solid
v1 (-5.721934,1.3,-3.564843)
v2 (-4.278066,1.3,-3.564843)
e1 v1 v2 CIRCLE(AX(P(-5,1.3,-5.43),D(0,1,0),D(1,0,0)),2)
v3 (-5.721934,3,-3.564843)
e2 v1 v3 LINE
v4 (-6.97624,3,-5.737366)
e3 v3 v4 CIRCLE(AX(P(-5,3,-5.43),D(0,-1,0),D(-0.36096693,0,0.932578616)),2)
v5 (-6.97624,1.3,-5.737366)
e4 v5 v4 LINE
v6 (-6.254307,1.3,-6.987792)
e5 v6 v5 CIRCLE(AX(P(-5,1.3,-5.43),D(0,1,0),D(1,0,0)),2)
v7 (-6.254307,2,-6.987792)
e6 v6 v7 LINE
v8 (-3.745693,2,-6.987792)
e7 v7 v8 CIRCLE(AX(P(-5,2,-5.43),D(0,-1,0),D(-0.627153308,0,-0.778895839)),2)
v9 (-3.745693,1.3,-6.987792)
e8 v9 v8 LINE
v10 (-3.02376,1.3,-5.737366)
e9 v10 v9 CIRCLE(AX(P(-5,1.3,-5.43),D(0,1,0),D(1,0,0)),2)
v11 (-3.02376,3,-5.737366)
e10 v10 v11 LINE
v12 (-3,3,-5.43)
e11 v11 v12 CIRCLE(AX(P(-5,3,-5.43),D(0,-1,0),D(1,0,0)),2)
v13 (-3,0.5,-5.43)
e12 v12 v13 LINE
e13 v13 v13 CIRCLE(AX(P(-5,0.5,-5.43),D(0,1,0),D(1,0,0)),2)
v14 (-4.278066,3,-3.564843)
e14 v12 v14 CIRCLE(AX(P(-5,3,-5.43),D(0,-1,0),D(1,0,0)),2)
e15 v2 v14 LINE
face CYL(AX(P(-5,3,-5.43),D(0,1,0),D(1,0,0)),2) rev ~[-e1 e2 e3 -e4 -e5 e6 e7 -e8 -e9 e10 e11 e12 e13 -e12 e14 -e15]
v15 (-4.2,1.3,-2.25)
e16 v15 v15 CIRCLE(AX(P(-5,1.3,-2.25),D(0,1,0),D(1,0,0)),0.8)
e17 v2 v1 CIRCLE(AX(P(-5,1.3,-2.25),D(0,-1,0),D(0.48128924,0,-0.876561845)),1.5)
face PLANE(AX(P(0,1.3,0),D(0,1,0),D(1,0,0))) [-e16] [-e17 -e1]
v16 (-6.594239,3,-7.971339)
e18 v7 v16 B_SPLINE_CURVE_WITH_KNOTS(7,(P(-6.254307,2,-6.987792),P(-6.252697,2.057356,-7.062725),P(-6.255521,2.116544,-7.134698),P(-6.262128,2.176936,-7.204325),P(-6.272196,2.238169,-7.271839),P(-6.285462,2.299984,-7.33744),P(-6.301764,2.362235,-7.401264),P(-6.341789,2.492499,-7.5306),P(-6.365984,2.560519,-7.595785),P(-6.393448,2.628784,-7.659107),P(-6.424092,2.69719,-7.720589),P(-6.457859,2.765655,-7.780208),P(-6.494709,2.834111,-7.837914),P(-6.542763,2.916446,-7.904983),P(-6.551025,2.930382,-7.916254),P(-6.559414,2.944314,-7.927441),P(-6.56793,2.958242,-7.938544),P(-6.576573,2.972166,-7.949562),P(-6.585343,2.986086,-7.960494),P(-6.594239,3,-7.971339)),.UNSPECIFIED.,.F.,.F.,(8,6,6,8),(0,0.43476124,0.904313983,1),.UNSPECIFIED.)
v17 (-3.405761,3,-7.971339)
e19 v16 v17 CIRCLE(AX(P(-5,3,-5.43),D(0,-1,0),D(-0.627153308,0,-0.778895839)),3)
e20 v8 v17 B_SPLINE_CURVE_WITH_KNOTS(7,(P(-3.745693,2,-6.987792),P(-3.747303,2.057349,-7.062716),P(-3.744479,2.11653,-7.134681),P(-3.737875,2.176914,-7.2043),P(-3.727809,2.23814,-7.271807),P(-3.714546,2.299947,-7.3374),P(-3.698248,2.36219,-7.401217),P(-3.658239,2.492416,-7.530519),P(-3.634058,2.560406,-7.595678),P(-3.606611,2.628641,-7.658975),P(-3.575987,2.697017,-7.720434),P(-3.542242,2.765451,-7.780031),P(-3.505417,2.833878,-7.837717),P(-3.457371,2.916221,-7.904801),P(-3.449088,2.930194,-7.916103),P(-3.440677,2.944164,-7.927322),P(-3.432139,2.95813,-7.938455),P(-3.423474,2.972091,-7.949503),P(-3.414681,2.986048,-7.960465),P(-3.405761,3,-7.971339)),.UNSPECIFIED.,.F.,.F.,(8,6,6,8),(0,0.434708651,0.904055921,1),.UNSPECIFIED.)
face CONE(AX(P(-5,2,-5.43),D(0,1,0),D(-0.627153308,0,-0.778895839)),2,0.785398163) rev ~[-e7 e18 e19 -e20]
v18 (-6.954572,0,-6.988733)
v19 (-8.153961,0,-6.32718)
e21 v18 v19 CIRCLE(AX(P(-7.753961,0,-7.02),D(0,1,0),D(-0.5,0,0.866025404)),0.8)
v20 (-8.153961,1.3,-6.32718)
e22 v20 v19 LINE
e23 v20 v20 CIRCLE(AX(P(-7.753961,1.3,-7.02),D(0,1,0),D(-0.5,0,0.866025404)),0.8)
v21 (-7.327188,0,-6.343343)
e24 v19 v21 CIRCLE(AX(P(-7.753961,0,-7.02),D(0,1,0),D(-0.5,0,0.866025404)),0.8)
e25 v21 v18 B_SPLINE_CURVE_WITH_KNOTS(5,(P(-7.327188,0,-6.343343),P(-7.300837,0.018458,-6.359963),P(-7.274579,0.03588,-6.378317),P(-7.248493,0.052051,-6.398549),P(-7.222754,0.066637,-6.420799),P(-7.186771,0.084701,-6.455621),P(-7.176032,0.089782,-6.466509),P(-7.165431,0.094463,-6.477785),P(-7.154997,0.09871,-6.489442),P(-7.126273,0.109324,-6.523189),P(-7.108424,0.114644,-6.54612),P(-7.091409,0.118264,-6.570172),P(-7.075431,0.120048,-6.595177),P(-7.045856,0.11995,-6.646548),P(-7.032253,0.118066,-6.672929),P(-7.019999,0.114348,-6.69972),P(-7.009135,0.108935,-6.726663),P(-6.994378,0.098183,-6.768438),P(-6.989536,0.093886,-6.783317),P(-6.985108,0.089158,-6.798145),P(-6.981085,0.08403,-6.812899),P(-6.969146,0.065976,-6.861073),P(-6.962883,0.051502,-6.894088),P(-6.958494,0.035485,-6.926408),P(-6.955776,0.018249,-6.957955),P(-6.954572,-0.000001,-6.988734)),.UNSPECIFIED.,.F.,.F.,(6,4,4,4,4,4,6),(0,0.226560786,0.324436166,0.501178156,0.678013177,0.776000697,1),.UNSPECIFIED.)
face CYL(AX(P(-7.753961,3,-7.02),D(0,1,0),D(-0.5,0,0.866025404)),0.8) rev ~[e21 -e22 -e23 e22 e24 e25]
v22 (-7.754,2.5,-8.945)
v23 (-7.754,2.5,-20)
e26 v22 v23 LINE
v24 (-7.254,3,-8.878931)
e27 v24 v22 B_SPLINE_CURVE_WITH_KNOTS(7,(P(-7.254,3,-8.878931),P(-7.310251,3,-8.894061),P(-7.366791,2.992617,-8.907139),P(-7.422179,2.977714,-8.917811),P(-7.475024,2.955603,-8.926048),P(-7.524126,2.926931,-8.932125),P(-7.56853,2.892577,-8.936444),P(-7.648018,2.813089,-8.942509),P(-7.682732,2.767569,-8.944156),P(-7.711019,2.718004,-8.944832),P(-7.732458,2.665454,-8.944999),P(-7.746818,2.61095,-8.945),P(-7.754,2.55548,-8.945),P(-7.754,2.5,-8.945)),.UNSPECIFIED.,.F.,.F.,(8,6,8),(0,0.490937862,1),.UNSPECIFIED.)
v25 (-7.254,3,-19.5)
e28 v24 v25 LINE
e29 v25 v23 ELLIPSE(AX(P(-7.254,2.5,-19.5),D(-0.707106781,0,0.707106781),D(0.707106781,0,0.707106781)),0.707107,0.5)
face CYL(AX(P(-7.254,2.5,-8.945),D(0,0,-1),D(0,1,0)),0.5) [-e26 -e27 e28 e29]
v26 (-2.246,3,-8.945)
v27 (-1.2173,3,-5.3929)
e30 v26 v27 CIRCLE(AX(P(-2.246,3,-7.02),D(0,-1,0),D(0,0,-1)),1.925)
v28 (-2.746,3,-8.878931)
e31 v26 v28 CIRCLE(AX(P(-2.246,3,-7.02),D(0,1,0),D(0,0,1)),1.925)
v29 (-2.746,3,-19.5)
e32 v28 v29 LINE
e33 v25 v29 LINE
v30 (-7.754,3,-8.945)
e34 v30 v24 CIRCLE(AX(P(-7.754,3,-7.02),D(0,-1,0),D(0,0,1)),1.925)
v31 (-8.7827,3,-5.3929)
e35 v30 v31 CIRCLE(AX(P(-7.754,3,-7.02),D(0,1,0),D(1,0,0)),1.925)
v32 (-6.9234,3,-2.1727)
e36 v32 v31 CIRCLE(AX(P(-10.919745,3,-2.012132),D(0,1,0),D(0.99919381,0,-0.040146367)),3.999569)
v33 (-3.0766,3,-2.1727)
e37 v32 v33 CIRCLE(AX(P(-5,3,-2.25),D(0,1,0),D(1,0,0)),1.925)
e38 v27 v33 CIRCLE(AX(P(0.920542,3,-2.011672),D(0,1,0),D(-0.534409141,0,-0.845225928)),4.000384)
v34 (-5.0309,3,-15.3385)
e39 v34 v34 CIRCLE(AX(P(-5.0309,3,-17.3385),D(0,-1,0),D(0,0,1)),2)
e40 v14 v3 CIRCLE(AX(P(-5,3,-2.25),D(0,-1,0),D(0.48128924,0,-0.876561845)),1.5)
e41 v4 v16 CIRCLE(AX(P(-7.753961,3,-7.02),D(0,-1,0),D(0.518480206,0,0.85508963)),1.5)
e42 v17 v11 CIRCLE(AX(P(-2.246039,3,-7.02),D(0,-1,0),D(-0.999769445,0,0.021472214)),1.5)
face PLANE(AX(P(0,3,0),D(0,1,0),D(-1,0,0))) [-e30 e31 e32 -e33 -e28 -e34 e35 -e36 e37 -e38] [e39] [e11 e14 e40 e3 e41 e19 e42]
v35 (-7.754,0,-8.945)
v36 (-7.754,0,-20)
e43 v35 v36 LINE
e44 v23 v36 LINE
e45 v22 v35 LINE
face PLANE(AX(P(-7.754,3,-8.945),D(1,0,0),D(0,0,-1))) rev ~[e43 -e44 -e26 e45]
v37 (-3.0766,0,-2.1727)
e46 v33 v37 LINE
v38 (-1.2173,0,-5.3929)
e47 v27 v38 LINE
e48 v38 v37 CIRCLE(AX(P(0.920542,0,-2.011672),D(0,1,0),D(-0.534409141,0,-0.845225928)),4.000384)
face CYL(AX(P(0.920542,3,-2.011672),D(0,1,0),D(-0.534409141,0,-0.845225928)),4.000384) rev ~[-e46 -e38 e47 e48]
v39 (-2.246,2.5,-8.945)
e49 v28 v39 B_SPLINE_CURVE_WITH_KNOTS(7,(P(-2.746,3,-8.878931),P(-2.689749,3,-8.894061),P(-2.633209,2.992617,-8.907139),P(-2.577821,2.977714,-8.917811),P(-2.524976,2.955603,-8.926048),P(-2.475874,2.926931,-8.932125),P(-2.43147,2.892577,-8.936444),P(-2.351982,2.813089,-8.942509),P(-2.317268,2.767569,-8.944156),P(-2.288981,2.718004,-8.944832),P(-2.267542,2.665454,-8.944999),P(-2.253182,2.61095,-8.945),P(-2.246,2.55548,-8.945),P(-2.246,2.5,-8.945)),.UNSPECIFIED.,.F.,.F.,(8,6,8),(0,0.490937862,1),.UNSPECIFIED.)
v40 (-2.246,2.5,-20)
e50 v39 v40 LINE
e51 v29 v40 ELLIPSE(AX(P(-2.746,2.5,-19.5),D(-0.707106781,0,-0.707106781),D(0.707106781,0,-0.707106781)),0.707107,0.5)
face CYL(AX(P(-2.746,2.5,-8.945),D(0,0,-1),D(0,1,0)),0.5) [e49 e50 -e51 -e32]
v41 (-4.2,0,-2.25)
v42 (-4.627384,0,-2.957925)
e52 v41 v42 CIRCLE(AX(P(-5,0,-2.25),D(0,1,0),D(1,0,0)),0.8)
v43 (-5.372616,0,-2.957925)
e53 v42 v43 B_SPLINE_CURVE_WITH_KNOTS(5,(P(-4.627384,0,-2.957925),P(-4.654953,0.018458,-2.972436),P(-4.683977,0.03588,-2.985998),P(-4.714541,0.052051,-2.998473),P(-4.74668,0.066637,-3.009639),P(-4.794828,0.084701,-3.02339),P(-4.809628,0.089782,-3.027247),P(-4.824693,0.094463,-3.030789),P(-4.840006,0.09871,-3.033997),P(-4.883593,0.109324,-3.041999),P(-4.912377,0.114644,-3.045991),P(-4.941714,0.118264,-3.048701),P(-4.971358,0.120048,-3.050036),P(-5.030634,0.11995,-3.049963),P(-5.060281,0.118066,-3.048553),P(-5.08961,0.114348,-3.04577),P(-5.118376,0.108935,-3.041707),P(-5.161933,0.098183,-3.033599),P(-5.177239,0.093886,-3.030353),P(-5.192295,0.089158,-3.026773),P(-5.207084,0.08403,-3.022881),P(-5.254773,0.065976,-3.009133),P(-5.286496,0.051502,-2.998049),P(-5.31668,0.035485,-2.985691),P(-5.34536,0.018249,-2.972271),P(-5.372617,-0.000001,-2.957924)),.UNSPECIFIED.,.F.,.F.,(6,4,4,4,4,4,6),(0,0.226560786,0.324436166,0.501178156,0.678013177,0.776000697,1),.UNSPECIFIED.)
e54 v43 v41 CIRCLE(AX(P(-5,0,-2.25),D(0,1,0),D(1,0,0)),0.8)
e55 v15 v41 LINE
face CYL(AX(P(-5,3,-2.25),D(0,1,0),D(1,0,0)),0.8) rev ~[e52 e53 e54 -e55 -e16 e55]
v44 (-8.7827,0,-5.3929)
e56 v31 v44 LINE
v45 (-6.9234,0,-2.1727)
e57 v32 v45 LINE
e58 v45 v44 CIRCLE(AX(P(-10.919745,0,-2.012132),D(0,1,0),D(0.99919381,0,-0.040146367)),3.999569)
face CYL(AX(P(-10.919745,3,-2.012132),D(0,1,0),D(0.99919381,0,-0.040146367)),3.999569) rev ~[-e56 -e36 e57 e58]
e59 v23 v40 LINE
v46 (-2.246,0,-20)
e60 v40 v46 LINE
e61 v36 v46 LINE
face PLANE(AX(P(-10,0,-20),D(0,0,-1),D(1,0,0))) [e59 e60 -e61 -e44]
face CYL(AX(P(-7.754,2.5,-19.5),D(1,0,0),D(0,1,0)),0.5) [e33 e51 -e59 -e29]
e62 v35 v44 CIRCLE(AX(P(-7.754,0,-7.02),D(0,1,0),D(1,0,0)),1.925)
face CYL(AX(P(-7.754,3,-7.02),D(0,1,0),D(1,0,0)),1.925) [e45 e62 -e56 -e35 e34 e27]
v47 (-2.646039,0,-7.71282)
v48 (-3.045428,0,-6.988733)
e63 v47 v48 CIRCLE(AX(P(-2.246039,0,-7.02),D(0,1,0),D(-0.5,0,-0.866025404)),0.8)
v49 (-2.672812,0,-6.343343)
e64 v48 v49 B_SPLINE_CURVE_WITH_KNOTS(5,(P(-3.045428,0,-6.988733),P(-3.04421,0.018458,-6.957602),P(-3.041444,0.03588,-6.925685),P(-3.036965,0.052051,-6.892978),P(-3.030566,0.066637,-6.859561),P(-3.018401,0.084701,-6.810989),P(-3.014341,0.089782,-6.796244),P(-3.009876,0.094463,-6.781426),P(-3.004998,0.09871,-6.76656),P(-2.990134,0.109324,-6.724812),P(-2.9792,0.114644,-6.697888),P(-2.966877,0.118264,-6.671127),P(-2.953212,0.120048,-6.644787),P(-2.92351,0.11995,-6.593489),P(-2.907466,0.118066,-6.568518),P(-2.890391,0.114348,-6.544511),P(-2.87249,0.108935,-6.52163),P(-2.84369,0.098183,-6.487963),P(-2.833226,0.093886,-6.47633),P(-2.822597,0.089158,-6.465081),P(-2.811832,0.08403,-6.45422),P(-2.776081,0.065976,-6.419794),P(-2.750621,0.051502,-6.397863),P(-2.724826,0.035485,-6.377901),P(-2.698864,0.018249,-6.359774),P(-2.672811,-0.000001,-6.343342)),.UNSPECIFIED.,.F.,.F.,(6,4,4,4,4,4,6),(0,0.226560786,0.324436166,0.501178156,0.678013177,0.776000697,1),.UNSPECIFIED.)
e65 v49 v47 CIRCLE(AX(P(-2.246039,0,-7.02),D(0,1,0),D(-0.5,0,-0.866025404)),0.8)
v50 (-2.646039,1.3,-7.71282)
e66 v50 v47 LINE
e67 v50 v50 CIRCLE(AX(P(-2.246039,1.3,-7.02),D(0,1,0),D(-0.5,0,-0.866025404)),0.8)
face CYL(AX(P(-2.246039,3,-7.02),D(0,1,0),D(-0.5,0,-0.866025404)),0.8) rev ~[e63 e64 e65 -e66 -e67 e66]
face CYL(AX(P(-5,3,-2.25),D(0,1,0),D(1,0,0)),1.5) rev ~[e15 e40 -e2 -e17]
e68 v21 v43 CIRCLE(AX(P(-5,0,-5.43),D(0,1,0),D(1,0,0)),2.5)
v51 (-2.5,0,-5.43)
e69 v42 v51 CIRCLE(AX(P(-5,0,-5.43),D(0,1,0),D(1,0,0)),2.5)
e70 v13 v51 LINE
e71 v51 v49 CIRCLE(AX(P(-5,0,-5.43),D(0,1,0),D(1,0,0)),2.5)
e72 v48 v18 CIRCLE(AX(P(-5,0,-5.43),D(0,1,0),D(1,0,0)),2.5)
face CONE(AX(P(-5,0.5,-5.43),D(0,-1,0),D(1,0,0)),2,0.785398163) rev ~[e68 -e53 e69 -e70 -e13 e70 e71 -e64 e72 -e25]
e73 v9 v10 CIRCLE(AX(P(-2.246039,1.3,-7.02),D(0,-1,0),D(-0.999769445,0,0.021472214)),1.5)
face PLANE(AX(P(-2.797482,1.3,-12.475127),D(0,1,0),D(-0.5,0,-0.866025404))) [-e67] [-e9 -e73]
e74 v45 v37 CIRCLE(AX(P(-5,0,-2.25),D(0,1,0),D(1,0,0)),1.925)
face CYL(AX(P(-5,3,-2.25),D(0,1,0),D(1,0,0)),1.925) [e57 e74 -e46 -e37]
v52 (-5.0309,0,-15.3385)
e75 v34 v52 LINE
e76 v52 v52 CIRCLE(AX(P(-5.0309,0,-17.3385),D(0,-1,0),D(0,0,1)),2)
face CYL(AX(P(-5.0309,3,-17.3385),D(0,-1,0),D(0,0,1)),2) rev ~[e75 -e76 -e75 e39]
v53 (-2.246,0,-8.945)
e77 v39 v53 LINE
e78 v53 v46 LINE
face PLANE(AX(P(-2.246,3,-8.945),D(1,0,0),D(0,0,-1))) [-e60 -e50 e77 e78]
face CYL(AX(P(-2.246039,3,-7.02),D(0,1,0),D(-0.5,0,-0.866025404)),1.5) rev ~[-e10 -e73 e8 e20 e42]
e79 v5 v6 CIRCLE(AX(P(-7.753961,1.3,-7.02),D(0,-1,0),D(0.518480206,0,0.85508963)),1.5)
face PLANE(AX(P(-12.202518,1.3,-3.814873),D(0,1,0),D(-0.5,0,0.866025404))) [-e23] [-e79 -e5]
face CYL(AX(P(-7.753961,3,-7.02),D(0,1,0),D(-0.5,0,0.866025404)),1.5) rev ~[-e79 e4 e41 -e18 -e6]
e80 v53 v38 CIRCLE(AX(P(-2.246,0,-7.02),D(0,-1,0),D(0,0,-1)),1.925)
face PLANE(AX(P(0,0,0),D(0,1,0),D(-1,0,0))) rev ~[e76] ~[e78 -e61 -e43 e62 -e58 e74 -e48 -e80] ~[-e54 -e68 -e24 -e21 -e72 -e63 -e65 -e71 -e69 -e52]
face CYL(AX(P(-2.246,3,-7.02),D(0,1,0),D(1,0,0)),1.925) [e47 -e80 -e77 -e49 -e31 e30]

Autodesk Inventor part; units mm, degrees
ref_plane "XZ Plane" through (0, 0, 0) normal (0, 1, 0) x (-1, 0, 0)
ref_plane "XY Plane" through (0, 0, 0) normal (0, 0, 1) x (1, 0, 0)
sketch "Sketch2" plane through (0, 0, 0) normal (0, 1, 0) x (-1, 0, 0)
  line L0 (0, 0) -> (10, 0)
  line L1 (10, 0) -> (10, -20)
  line L2 (10, -20) -> (0, -20)
  line L3 (0, -20) -> (0, 0)
  dimension "d0" = 20
  dimension "d1" = 10
extrude "Extrusion1" add sketch "Sketch2" along normal blind 3
sketch "Sketch3" plane through (0, 3, 0) normal (0, 1, 0) x (1, 0, 0)
  line L0 (-10, 20) -> (-10, 0) projected
  line L1 (0, 20) -> (-10, 20) projected
  line L2 (-10, 0) -> (0, 0) projected
  circle A0 centre (-5, 2.25) radius 0.8
  circle A1 centre (-5, 2.25) radius 1.5
  circle A2 centre (-5, 5.43) radius 2
  point P0 (-4.2781, 3.5648)
  point P1 (-5.7219, 3.5648)
  dimension "d4" = 5
  dimension "d7" = 0
  dimension "d8" = 3.18
  dimension "d10" = 1.6
  dimension "d11" = 2.25
  dimension "d12" = 3
  dimension "d13" = 4
extrude "Extrusion2" cut sketch "Sketch3" against normal through all contours A0
pattern_circular "Circular Pattern1" count 3 over 360 about axis through (-5, 3, -5.43) along (0, 1, 0) of "Extrusion2"
ref_plane "Work Plane2" through (0, 1.3, 0) normal (0, -1, 0) x (1, 0, 0)
ref_plane "Work Plane1" through (0, 0, 0) normal (0, -1, 0) x (1, 0, 0)
extrude "Extrusion3" cut sketch "Sketch3" against normal up to surface (1.7 mm away) contours A0 | A1 A2 | A2 A1 picked at (-5.474, 3.3061) picked at (-4.9499, 3.5442)
extrude "Extrusion4" cut sketch "Sketch3" against normal through all contours A2 A1 | A1 A2 picked at (-4.9499, 3.5442) picked at (-4.9466, 6.1911)
pattern_circular "Circular Pattern2" count 3 over 360 about axis through (-5, 3, -5.43) along (0, 1, 0) of "Extrusion4", "Extrusion3"
sketch "Sketch6" plane through (0, 3, 0) normal (0, 1, 0) x (1, 0, 0)
  arc A0 (-6.2543, 6.9878) -> (-6.9762, 5.7374) centre (-7.754, 7.02) ccw projected
  circle A1 centre (-7.754, 7.02) radius 1.925
  arc A2 (-3.7457, 6.9878) -> (-6.2543, 6.9878) centre (-5, 5.43) ccw projected
  circle A3 centre (-5, 2.25) radius 1.925
  circle A4 centre (-2.246, 7.02) radius 1.925
  arc A5 (-6.9234, 2.1727) -> (-8.7827, 5.3929) centre (-10.9202, 2.012) ccw
  arc A6 (-1.2173, 5.3929) -> (-3.0766, 2.1727) centre (0.9202, 2.012) ccw
  arc A7 (-6.8592, 8.7244) -> (-3.1408, 8.7244) centre (-5, 12.2661) ccw
  line L0 (-7.754, 8.945) -> (-7.754, 22.7123)
  line L1 (-7.754, 22.7123) -> (-16.28, 22.7123)
  line L2 (-16.28, 22.7123) -> (-16.28, -9.8438)
  line L3 (-16.28, -9.8438) -> (12.2065, -9.8438)
  line L4 (12.2065, -9.8438) -> (12.2065, 22.7123)
  line L5 (12.2065, 22.7123) -> (-2.5928, 22.7123)
  line L6 (-2.246, 8.945) -> (-2.246, 22.7123)
  point P0 (0, 0)
  point P1 (-1.2173, 5.3929)
  point P2 (-3.0766, 2.1727)
  dimension "d35" = 0.425
  dimension "d38" = 360
  dimension "d40" = 4
  dimension "d43" = 360
extrude "Extrusion5" cut sketch "Sketch6" against normal through all contours A1 A5 A3 A6 A4 L6 L5 L4 L3 L2 L1 L0
sketch "Sketch7" plane through (0, 3, 0) normal (0, 1, 0) x (1, 0, 0)
  point P0 (0, 0)
  point P1 (-5.0309, 17.3385)
hole "Hole1" at (-5.0309, 3, -17.3385) direction (0, -1, 0) diameter 4 end through all
chamfer "Chamfer1" distance 1 angle 45 1 edges at (-5, 3, -7.43)
chamfer "Chamfer2" distance 0.5 angle 45 1 edges at (-4.2781, 0, -7.2952)
ref_plane "Work Plane3" through (-5, 0, -1.45) normal (1, 0, 0) x (0, 1, 0)
fillet "Fillet4" radius 0.5 3 edges at (-5, 3, -20) (-2.246, 3, -14.4725) (-7.754, 3, -14.4725)
equation "\"d4\" = 0.5 * d1"
properties part number "motorholder-nocurvature"
